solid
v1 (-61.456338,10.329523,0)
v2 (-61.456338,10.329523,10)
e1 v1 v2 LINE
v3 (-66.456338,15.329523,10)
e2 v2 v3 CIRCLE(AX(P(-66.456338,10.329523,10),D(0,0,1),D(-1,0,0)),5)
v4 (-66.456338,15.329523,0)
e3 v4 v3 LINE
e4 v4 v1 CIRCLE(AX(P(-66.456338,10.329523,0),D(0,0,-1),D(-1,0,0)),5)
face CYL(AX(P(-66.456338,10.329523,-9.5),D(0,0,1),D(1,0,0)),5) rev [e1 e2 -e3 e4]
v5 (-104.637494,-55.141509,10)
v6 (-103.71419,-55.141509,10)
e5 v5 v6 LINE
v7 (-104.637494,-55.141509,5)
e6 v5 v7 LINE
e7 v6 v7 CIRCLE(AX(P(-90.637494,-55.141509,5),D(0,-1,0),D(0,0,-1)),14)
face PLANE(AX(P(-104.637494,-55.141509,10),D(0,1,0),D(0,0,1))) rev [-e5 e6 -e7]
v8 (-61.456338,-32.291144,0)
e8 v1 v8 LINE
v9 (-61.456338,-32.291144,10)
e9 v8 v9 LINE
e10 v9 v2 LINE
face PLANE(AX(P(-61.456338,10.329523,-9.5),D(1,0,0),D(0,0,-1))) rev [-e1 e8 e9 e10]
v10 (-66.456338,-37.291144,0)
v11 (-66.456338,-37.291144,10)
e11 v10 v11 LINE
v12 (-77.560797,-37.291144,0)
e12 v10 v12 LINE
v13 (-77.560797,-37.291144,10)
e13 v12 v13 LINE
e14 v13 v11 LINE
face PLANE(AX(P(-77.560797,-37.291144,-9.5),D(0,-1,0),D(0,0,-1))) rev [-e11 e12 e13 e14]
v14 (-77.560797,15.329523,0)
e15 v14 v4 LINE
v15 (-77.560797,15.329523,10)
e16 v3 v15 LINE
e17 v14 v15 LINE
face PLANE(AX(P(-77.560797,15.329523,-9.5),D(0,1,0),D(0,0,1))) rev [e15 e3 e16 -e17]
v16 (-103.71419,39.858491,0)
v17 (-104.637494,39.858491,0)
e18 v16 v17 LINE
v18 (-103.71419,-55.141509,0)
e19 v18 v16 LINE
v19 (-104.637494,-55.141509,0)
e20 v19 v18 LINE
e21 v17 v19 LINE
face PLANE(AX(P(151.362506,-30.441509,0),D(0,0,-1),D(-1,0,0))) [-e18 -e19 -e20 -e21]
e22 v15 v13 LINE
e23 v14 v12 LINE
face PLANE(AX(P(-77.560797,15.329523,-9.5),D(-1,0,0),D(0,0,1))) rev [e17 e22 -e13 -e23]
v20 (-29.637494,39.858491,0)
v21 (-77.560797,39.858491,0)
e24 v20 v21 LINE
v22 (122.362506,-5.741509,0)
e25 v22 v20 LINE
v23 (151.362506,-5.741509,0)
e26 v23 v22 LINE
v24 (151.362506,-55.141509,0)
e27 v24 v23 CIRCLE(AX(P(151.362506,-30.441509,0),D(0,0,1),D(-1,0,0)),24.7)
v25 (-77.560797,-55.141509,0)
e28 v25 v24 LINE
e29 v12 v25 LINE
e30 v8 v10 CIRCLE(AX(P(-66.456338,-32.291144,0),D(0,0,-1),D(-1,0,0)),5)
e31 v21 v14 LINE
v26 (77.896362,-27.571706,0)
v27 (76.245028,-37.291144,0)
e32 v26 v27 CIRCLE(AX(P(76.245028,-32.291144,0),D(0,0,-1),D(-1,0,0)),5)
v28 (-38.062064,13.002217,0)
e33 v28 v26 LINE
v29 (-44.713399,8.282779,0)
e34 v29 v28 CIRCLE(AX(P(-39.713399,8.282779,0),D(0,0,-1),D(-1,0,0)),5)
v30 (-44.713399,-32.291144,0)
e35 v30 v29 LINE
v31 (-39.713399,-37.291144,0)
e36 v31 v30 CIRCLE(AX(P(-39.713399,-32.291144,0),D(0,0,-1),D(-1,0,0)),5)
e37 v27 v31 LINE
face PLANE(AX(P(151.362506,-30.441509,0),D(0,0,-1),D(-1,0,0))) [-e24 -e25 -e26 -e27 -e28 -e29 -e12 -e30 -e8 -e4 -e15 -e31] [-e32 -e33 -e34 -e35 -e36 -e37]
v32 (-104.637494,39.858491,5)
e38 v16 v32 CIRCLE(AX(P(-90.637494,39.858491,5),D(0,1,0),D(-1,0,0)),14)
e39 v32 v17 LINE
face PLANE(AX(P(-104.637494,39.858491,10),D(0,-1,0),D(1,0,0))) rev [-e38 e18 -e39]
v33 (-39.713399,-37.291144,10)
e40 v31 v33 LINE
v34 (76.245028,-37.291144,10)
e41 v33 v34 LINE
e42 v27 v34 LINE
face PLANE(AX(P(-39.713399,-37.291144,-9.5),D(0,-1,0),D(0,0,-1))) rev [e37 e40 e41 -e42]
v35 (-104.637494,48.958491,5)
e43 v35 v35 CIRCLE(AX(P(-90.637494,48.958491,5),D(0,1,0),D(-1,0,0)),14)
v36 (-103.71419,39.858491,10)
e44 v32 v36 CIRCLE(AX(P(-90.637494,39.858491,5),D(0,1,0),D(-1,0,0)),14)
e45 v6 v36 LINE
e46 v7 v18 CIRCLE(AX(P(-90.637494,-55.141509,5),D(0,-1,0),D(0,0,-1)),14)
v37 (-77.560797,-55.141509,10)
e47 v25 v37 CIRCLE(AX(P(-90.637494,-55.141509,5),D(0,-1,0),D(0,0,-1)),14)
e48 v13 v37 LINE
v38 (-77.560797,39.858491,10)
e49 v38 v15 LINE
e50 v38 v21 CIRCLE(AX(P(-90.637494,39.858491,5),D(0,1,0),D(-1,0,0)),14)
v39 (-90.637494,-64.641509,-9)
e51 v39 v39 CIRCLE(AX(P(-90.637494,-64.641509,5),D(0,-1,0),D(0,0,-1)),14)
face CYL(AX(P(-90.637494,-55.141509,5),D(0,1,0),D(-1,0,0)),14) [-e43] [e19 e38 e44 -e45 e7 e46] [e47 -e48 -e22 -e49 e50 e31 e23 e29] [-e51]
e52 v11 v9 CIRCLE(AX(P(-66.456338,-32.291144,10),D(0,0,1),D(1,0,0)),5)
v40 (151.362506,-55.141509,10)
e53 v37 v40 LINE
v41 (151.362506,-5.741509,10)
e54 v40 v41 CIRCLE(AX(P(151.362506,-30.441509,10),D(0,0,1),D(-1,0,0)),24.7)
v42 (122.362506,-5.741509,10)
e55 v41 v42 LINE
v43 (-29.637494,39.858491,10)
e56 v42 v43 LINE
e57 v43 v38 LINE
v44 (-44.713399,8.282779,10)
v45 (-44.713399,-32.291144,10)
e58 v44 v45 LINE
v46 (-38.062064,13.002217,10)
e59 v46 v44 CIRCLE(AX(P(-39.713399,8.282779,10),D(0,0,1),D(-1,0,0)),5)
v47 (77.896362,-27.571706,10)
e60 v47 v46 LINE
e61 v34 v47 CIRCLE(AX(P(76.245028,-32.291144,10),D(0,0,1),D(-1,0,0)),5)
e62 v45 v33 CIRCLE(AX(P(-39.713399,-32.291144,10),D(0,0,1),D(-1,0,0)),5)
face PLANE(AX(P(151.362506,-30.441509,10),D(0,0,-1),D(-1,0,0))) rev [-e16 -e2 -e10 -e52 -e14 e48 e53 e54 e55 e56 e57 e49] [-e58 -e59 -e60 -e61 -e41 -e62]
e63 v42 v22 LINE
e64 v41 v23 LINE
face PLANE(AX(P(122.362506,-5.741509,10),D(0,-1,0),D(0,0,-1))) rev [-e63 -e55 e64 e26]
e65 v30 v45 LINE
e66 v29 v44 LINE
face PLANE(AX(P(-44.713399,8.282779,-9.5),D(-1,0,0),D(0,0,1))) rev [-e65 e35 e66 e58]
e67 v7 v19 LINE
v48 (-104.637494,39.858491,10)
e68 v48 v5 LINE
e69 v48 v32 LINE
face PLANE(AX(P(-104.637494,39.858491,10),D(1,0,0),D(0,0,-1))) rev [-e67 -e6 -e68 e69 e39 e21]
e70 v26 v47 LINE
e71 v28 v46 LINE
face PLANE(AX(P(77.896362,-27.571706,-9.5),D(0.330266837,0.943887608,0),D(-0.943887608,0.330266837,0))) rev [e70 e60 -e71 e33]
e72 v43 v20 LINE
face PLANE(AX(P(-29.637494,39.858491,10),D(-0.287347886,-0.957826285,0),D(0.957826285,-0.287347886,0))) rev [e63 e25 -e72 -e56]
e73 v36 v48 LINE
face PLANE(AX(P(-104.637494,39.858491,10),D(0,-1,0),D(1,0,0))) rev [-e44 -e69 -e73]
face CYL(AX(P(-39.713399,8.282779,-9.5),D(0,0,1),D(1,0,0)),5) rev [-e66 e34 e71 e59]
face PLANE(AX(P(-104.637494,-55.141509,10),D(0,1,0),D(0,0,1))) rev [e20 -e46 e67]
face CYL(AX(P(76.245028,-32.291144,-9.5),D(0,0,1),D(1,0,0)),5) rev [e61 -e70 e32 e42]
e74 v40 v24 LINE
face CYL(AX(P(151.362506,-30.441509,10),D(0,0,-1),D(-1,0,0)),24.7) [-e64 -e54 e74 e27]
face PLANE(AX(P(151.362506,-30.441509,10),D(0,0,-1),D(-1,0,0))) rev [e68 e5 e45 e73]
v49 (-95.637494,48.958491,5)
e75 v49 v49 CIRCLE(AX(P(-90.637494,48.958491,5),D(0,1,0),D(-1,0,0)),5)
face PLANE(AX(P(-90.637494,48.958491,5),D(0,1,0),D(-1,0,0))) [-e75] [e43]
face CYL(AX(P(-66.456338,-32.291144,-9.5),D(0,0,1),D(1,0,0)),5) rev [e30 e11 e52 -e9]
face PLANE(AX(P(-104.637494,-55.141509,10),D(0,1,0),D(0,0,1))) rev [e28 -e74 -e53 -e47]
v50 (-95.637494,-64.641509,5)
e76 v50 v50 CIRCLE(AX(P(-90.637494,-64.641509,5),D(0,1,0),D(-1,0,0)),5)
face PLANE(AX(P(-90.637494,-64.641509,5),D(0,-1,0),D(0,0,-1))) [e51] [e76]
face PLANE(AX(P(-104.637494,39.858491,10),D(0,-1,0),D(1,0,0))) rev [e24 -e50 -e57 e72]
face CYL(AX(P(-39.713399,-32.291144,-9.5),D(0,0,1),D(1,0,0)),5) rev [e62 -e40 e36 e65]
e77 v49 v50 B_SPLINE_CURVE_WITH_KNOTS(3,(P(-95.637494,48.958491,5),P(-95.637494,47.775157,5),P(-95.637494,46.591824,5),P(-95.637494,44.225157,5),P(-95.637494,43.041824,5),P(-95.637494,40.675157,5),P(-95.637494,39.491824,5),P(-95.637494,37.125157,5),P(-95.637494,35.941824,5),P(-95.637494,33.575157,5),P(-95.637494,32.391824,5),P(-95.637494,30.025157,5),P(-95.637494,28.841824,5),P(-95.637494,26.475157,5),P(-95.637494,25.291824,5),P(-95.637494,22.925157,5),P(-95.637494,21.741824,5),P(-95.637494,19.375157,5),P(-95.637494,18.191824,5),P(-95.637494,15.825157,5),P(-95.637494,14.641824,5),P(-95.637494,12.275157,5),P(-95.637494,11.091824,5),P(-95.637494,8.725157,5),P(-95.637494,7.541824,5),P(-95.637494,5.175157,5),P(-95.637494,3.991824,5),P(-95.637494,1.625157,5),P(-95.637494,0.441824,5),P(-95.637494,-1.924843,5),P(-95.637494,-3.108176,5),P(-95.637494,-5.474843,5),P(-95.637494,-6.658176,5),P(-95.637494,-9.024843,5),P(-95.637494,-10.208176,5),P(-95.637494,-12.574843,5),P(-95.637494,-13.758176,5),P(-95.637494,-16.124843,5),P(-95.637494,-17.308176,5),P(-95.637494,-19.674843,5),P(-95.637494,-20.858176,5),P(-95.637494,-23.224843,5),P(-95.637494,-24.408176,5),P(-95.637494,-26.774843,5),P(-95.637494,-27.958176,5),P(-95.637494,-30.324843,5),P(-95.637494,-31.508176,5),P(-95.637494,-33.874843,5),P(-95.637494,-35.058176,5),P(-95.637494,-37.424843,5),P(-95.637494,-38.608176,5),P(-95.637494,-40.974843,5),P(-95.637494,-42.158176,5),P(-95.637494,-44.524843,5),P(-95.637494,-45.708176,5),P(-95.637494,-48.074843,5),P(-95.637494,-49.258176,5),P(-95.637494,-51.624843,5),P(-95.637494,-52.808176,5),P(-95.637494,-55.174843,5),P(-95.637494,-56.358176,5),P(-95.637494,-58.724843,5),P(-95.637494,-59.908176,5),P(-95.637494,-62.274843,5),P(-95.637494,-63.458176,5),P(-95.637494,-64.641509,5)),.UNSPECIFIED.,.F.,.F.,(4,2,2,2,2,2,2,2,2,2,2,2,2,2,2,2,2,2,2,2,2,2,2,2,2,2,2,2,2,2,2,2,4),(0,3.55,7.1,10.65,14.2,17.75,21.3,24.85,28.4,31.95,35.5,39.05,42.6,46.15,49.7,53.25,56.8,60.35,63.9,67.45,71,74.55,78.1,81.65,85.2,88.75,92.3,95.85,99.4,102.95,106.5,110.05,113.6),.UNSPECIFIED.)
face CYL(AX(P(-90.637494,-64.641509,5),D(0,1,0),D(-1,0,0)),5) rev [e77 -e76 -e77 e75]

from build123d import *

# Parameters (mm, degrees)
EXTRUDE_1_DEPTH          = 10
SKETCH_2_R               = 14
EXTRUDE_2_DEPTH          = 95
EXTRUDE_START            = 9.1
SKETCH_3_R               = 14
EXTRUDE_3_DEPTH          = 9.1
SKETCH_5_R               = 14
EXTRUDE_4_DEPTH          = 9.5
CUT_EXTRUDE_1_DEPTH      = 211.390033392
CUT_EXTRUDE_1_DEPTH_BACK = 211.390033392
SKETCH_6_R               = 5
CUT_EXTRUDE_2_DEPTH      = 19.5


with BuildPart() as part:
    # 스케치1 → 보스-돌출1 (new body)
    with BuildSketch(Plane.XY):
        with BuildLine():
            Line((-104.637493626, 39.858490566), (-104.637493626, -55.141509434))
            Line((-104.637493626, -55.141509434), (151.362506374, -55.141509434))
            ThreePointArc((151.362506374, -55.141509434), (176.062506374, -30.441509434), (151.362506374, -5.741509434))
            Line((151.362506374, -5.741509434), (122.362506374, -5.741509434))
            Line((122.362506374, -5.741509434), (-29.637493626, 39.858490566))
            Line((-29.637493626, 39.858490566), (-104.637493626, 39.858490566))
        make_face()
    extrude(amount=EXTRUDE_1_DEPTH)

    # 스케치2 → 보스-돌출2 (add)
    with BuildSketch(Plane(origin=(0, 39.858490566, 0), x_dir=(1, 0, 0), z_dir=(0, 1, 0))):
        with Locations((-90.637493626, -5)):
            Circle(SKETCH_2_R)
    extrude(amount=-EXTRUDE_2_DEPTH)

    # 스케치3 → 보스-돌출3 (add)
    with BuildSketch(Plane(origin=(0, 39.858490566, 0), x_dir=(1, 0, 0), z_dir=(0, 1, 0)).offset(EXTRUDE_START)):
        with Locations((-90.637493626, -5)):
            Circle(SKETCH_3_R)
    extrude(amount=-EXTRUDE_3_DEPTH)

    # 스케치5 → 보스-돌출4 (add)
    with BuildSketch(Plane.XZ.offset(55.141509434)):
        with Locations((-90.637493626, 5)):
            Circle(SKETCH_5_R)
    extrude(amount=EXTRUDE_4_DEPTH)

    # 스케치6 → 컷-돌출1 (cut, two sides: drawn at the far end of the back side and taken through both)
    with BuildSketch(Plane(origin=(0, 48.958490566, 0), x_dir=(1, 0, 0), z_dir=(0, 1, 0)).offset(-CUT_EXTRUDE_1_DEPTH_BACK)):
        with Locations((-90.637493626, -5)):
            Circle(SKETCH_6_R)
    extrude(amount=CUT_EXTRUDE_1_DEPTH + CUT_EXTRUDE_1_DEPTH_BACK, mode=Mode.SUBTRACT)

    # 스케치7 → 컷-돌출2 (cut)
    with BuildSketch(Plane.XY.offset(10)):
        with BuildLine():
            Line((-77.560796795, 15.329522676), (-66.456337958, 15.329522676))
            ThreePointArc((-66.456337958, 15.329522676), (-62.920804052, 13.865056582), (-61.456337958, 10.329522676))
            Line((-61.456337958, 10.329522676), (-61.456337958, -32.291143793))
            ThreePointArc((-61.456337958, -32.291143793), (-62.920804052, -35.826677699), (-66.456337958, -37.291143793))
            Line((-66.456337958, -37.291143793), (-77.560796795, -37.291143793))
            Line((-77.560796795, -37.291143793), (-77.560796795, 15.329522676))
        make_face()
        with BuildLine():
            Line((-44.713398627, 8.282778838), (-44.713398627, -32.291143793))
            ThreePointArc((-44.713398627, -32.291143793), (-43.248932532, -35.826677699), (-39.713398627, -37.291143793))
            Line((-39.713398627, -37.291143793), (76.245027984, -37.291143793))
            ThreePointArc((76.245027984, -37.291143793), (81.1743885, -33.128642988), (77.896362169, -27.571705753))
            Line((77.896362169, -27.571705753), (-38.062064442, 13.002216878))
            ThreePointArc((-38.062064442, 13.002216878), (-42.606781515, 12.360564446), (-44.713398627, 8.282778838))
        make_face()
    extrude(amount=-CUT_EXTRUDE_2_DEPTH, mode=Mode.SUBTRACT)


solid = part.part
